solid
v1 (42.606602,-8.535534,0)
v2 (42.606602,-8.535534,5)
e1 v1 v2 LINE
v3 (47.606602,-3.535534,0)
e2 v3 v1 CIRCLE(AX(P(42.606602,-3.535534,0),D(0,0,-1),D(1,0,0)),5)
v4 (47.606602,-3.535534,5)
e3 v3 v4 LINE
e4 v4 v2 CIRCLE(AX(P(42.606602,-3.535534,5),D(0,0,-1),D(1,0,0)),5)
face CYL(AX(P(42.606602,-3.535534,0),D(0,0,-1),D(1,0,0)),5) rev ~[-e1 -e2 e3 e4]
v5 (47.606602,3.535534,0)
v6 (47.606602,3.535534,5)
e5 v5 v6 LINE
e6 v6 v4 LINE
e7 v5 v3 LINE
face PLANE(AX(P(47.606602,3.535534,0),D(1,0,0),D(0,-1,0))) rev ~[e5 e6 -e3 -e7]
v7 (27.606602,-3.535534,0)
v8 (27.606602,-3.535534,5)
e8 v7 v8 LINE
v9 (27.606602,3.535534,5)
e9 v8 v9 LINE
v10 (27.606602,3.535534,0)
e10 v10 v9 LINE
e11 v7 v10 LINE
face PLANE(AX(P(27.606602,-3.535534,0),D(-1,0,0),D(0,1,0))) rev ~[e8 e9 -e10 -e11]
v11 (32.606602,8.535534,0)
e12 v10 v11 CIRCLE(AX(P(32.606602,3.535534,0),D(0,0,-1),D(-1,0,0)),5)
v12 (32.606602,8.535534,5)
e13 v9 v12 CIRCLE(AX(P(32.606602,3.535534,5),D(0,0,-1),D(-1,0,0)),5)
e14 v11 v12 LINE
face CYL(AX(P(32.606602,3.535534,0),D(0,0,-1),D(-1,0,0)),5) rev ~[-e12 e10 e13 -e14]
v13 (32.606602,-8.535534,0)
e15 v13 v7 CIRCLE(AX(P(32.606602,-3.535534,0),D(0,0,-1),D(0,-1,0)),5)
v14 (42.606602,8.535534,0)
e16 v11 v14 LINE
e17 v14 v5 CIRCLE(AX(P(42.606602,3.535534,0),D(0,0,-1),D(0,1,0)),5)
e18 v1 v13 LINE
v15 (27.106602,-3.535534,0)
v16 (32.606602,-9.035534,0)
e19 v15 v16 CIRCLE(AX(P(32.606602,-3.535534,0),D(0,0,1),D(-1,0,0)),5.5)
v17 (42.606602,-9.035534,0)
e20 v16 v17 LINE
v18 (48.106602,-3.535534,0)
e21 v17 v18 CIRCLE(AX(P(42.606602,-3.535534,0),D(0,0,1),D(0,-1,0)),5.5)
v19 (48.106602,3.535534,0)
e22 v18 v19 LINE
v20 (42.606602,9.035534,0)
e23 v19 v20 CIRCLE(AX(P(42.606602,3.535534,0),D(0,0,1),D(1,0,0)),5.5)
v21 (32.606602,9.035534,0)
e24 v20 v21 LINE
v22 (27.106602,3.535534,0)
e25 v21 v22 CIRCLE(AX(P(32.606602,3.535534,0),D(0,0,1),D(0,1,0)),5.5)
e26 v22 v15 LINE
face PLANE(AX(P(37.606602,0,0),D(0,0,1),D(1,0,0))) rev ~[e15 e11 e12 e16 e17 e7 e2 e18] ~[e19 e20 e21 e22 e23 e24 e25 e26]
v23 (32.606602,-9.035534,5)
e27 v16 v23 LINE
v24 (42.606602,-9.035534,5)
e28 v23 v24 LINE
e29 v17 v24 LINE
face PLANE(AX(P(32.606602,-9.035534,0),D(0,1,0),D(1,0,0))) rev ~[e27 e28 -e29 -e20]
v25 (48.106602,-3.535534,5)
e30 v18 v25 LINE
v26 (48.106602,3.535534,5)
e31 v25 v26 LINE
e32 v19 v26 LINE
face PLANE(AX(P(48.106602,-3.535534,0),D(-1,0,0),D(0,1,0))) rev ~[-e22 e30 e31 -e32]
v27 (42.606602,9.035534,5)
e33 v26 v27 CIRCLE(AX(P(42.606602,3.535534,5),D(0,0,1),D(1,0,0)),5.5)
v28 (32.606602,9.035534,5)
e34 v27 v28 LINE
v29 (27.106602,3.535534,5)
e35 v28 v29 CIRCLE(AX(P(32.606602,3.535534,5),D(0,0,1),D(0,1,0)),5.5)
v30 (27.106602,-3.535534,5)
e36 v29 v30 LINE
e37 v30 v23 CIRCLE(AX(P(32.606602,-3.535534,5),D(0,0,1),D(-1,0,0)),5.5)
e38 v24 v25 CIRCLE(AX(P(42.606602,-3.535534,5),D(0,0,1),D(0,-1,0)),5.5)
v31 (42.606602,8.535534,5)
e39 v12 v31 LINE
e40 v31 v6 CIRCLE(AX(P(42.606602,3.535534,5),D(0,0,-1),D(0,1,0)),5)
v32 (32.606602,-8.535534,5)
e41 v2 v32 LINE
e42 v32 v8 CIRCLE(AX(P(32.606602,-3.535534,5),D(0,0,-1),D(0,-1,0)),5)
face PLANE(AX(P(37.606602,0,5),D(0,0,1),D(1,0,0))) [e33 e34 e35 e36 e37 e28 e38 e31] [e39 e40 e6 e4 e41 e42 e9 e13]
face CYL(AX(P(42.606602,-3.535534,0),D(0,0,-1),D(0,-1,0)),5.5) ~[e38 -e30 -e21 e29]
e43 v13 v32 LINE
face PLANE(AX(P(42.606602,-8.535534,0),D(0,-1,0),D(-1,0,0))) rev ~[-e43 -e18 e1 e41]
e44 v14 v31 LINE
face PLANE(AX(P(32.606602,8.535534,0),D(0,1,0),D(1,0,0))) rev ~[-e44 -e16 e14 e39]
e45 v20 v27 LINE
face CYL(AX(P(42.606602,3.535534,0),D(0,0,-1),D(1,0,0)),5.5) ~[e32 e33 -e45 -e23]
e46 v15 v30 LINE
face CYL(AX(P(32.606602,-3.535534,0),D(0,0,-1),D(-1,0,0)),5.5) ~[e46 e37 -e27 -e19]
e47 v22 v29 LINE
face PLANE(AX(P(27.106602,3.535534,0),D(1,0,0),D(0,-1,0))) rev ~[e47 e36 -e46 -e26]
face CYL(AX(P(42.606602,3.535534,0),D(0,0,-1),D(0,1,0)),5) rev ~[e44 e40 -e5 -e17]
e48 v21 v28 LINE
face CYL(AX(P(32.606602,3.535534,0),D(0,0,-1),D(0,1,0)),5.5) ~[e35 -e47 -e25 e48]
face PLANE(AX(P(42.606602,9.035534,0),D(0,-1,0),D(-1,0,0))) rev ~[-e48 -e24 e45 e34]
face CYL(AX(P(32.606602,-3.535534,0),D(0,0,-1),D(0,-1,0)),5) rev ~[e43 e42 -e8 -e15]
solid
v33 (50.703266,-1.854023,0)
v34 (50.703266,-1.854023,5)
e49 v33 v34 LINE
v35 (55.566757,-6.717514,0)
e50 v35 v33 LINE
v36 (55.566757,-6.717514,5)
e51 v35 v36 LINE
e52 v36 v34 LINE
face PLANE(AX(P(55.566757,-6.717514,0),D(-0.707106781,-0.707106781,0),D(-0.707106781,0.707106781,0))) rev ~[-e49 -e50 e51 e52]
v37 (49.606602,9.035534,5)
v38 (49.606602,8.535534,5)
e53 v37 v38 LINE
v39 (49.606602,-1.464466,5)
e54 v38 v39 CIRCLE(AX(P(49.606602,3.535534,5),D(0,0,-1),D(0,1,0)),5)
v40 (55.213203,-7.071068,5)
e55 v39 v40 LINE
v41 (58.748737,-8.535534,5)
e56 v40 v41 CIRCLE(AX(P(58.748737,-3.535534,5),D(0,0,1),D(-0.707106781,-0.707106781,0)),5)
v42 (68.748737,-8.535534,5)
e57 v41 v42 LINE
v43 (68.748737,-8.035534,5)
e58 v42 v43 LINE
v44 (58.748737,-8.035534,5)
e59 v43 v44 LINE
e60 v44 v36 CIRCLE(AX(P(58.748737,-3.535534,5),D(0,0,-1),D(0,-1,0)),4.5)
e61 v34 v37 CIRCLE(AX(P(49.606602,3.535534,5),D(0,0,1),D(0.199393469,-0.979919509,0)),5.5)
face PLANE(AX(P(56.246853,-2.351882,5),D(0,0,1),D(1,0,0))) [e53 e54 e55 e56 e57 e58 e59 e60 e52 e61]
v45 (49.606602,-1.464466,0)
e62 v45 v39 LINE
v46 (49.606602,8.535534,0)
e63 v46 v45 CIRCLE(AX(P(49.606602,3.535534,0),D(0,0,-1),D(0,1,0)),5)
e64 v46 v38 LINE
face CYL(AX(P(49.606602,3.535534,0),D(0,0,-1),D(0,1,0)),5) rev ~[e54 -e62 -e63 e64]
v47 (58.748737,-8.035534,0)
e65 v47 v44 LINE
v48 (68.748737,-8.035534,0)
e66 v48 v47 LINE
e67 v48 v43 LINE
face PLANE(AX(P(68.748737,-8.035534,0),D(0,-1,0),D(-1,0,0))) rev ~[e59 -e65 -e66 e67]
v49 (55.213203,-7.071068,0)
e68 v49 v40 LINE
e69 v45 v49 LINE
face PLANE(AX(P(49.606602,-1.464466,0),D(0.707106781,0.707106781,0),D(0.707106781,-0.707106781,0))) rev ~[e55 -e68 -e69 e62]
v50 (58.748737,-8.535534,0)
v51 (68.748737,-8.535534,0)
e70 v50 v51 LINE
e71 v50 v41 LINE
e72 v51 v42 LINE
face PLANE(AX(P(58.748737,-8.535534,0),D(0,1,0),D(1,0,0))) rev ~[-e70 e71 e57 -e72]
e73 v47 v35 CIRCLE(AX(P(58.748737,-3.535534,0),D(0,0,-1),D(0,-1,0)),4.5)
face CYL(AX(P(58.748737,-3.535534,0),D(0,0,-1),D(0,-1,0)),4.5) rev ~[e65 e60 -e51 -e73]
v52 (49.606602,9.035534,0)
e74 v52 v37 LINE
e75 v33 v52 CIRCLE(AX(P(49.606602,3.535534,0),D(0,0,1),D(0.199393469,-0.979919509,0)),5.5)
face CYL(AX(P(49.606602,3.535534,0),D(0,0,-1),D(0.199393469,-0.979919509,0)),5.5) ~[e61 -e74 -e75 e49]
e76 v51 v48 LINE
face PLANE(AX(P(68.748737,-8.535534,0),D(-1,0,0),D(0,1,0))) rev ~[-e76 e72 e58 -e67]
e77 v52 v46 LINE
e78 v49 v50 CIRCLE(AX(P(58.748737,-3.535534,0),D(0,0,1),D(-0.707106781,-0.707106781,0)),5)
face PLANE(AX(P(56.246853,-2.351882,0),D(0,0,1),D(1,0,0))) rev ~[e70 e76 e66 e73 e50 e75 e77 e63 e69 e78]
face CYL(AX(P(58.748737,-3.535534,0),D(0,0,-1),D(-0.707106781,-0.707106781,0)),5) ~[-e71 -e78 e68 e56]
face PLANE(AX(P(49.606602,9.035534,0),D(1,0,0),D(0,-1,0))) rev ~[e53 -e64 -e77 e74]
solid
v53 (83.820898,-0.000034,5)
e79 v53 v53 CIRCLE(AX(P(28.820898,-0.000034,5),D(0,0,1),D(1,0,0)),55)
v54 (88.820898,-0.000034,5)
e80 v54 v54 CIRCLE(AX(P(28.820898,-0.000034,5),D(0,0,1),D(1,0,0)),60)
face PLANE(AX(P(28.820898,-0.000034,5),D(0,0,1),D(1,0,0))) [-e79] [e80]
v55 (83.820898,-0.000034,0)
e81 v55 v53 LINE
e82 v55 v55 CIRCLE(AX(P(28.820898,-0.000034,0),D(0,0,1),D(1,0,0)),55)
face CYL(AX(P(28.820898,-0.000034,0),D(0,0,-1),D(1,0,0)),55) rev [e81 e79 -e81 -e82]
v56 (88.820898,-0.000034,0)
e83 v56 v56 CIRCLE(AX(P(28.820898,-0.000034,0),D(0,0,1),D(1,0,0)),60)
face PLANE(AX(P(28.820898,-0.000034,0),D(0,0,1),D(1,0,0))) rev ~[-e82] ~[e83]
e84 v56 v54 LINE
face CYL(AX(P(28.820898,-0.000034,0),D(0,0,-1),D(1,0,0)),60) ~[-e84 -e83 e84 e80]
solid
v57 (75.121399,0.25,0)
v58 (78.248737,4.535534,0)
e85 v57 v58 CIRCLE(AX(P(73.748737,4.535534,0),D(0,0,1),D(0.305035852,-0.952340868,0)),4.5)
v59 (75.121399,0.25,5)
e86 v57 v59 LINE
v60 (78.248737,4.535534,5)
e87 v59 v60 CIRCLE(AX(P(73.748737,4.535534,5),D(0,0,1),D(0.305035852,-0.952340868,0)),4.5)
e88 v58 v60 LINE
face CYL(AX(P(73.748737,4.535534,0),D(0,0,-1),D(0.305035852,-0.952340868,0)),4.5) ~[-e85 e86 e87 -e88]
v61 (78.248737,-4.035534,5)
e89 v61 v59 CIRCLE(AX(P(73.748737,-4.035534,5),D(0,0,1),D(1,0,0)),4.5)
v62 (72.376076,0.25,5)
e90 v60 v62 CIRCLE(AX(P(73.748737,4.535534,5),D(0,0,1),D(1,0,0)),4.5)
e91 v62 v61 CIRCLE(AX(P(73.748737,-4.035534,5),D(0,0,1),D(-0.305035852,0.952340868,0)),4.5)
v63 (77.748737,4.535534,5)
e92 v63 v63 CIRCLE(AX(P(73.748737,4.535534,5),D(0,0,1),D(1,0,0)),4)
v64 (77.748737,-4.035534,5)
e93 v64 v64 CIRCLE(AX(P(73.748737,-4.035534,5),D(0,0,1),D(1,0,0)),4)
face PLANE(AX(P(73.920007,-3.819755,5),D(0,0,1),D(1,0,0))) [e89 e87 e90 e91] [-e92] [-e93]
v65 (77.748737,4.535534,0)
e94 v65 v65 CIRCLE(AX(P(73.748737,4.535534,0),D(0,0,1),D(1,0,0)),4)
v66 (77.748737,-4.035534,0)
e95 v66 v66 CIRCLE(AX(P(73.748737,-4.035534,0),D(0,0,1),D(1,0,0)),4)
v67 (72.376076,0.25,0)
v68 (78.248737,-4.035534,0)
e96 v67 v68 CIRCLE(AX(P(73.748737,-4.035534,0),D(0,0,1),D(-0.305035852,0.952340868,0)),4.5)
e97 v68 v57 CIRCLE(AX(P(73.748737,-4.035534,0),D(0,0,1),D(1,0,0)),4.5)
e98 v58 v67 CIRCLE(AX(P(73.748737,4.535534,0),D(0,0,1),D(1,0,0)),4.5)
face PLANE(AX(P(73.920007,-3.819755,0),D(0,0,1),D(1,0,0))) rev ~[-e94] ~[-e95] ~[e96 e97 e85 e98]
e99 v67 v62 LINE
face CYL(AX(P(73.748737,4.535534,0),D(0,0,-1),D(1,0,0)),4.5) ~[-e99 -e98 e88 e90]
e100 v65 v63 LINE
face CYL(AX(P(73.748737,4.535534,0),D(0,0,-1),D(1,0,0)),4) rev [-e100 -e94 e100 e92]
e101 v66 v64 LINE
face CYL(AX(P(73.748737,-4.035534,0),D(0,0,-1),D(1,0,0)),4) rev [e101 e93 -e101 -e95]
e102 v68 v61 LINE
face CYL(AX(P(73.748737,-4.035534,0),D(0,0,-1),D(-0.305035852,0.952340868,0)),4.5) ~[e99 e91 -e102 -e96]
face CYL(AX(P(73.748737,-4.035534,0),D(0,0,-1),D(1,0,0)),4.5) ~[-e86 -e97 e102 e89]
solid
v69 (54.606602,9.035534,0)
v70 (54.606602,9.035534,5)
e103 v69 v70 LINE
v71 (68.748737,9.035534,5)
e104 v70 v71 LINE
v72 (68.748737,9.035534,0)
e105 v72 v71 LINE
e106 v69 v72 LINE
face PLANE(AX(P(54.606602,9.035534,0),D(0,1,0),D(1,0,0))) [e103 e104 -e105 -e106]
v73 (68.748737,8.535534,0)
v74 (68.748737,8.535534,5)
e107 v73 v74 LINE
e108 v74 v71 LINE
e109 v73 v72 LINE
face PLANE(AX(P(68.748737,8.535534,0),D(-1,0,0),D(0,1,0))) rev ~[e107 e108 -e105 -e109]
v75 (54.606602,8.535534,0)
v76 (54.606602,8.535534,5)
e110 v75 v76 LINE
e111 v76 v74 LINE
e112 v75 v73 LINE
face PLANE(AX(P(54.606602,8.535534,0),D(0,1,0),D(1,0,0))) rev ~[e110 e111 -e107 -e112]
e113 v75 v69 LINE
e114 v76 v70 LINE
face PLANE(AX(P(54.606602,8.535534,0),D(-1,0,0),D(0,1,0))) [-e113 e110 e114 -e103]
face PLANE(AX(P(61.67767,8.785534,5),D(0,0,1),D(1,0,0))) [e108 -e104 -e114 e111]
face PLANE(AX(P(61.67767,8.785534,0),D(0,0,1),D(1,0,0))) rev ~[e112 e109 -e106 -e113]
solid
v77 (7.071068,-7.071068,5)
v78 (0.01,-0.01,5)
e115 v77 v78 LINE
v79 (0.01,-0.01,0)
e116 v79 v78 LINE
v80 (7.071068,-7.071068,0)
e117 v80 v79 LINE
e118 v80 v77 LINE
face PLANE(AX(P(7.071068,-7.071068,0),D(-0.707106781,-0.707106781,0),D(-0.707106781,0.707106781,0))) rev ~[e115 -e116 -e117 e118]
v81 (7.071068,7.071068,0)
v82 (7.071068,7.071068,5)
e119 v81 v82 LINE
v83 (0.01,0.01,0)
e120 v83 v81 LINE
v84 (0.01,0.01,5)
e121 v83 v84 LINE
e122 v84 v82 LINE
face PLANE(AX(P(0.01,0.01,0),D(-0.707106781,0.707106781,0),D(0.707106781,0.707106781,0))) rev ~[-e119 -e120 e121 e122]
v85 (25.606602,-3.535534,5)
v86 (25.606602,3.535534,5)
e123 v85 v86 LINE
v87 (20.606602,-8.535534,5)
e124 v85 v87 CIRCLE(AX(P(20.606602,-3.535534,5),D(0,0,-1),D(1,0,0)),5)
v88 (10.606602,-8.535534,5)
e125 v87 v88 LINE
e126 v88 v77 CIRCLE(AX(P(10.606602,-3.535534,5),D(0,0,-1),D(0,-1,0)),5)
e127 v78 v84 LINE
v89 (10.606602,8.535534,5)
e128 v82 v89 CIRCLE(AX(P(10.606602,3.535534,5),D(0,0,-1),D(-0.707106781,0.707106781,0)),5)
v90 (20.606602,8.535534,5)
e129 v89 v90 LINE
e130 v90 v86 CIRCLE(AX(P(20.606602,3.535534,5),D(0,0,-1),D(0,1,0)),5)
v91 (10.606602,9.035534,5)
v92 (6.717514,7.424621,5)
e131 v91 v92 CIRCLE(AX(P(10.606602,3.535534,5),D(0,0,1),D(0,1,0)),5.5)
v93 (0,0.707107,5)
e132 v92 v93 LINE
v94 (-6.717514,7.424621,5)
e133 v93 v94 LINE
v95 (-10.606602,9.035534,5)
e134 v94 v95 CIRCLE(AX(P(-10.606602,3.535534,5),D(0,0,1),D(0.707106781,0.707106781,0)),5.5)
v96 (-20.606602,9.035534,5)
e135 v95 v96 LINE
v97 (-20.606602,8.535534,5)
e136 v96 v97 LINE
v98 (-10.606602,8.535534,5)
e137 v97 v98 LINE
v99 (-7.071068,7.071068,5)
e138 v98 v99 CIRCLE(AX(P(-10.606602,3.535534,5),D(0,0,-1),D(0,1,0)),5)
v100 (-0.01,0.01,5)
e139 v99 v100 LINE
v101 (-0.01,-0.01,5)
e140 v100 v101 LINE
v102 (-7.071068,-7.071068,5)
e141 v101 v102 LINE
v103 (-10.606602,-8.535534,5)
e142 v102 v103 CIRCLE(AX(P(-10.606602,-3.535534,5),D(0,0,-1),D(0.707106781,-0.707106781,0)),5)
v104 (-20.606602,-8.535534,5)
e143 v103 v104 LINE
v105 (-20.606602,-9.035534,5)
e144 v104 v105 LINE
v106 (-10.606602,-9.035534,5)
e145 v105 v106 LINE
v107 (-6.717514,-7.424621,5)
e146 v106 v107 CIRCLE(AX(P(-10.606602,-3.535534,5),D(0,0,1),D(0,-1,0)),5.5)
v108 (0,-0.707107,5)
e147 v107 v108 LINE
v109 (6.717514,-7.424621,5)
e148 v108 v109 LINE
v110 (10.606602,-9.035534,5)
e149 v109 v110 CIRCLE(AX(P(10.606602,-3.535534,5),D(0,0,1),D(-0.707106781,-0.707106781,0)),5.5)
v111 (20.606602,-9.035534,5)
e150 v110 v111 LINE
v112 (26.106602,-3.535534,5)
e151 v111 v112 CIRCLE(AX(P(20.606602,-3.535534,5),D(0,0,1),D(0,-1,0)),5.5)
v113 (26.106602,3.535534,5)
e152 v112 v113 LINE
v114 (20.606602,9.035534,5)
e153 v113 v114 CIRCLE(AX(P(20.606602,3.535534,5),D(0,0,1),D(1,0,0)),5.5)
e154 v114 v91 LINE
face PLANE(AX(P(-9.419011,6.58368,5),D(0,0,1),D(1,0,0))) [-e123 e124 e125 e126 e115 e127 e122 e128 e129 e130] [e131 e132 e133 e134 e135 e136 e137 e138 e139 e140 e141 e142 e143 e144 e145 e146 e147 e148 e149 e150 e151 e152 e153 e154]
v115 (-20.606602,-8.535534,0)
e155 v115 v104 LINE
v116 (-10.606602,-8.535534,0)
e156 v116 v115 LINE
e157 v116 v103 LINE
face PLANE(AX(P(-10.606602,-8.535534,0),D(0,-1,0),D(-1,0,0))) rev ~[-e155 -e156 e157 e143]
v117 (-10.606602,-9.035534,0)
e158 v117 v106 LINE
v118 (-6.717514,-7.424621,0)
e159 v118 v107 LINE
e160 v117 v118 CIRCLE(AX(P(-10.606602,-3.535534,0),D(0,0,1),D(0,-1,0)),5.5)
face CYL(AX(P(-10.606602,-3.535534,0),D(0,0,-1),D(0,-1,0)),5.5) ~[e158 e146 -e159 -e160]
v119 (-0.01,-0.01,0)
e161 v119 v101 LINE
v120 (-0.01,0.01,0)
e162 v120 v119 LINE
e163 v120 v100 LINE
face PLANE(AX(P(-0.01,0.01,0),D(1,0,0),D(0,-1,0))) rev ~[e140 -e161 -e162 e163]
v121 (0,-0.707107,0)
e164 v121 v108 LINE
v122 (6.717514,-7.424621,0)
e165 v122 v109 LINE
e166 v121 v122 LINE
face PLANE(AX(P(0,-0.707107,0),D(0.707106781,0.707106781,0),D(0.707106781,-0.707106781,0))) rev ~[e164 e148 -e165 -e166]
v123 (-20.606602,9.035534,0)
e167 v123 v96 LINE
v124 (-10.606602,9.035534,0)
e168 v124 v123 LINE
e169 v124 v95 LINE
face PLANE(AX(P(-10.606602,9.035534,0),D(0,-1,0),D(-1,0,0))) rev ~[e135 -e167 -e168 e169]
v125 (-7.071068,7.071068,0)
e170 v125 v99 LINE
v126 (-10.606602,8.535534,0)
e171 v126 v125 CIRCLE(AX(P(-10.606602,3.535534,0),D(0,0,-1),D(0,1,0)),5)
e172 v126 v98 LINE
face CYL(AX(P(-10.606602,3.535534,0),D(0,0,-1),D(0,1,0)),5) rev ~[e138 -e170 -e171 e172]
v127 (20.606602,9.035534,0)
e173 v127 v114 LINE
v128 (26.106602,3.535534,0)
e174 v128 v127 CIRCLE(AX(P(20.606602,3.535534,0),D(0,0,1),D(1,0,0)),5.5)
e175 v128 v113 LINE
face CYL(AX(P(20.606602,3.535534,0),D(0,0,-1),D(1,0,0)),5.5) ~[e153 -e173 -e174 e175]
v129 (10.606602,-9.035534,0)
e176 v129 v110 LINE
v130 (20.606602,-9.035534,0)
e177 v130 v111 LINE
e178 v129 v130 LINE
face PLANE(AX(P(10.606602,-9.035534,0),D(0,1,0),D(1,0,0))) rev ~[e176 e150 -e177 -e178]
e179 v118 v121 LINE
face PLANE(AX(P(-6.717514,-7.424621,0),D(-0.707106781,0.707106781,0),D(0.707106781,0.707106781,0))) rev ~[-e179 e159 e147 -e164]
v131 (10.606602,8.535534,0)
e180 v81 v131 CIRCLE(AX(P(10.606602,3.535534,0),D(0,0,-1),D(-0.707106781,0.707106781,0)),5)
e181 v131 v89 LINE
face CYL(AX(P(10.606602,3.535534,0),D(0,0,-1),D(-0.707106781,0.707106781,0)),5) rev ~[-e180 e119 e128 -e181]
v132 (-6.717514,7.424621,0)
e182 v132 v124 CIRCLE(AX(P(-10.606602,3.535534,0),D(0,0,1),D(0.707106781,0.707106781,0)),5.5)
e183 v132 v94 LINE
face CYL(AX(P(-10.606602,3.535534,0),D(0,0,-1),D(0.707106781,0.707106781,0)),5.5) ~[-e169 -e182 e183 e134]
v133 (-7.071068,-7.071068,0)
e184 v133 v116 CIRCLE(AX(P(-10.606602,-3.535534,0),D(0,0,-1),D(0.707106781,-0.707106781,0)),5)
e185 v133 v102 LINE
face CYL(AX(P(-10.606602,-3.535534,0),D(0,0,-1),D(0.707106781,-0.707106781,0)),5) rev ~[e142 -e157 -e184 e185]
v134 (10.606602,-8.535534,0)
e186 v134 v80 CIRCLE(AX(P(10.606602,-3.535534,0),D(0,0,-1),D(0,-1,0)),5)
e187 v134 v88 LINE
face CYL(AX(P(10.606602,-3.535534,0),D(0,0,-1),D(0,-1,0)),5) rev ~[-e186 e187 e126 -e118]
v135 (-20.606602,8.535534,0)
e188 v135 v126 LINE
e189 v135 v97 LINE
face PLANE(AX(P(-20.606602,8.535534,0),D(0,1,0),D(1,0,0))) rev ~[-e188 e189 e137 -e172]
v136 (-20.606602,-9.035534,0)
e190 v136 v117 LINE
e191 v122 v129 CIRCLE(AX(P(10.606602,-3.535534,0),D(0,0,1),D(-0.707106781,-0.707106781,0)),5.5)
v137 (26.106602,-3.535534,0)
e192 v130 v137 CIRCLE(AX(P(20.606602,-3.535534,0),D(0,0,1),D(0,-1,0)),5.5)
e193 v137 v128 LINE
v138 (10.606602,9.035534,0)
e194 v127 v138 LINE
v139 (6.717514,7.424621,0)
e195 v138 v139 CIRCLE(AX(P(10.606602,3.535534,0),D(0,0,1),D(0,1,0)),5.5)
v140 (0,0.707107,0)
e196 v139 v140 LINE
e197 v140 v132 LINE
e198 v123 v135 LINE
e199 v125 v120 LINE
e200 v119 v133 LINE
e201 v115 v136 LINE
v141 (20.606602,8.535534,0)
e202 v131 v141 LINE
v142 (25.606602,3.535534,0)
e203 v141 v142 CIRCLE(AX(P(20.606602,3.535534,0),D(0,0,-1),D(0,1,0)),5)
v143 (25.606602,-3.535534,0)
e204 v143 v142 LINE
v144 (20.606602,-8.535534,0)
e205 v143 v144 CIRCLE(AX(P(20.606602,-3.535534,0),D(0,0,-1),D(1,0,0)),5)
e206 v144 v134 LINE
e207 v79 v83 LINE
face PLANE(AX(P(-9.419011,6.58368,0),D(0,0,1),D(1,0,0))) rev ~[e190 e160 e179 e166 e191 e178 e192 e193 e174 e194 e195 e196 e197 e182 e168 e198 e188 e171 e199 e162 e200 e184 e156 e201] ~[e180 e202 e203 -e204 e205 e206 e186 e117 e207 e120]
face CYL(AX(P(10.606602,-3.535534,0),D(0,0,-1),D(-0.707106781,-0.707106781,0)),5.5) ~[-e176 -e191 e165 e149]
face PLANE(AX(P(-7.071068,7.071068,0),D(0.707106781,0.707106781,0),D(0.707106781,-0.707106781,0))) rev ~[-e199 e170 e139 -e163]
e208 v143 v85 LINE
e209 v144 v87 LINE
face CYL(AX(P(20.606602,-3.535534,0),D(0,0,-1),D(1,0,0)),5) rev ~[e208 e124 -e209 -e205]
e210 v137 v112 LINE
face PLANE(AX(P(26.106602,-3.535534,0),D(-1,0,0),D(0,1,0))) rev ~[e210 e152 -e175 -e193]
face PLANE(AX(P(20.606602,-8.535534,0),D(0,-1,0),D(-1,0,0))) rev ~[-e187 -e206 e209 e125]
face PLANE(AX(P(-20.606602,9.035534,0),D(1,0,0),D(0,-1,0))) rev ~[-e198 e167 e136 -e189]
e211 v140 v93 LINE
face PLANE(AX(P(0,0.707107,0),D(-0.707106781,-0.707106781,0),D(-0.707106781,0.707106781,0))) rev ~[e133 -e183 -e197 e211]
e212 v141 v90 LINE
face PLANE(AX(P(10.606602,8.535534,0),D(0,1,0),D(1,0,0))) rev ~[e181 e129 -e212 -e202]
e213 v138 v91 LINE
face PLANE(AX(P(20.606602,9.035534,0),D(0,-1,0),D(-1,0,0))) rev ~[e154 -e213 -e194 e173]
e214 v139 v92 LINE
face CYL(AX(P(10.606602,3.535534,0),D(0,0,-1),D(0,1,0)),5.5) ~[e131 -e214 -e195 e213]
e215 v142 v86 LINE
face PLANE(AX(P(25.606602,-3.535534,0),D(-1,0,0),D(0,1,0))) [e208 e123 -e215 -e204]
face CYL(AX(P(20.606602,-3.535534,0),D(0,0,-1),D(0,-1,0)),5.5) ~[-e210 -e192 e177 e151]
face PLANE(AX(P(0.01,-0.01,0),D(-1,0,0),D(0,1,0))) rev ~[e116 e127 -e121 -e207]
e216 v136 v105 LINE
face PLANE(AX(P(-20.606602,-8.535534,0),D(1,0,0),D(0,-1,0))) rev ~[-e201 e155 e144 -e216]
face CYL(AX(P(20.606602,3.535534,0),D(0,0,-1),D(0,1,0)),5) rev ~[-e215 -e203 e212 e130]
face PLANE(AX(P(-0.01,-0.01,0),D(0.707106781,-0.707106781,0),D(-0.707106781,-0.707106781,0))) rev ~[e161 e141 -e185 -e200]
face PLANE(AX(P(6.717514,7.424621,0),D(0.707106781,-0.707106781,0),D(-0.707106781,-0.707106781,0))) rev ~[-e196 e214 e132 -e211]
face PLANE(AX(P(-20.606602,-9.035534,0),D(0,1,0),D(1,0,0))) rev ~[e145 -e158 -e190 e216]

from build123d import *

# Parameters (mm, degrees)
F0_W     = 0.5
F0_H     = 7.0710678119
F1_DEPTH = 5
F0_W_2   = 14.1421356237
F0_H_2   = 0.5
F0_R     = 4
F0_R_2   = 60
F0_R_3   = 55


# Not quite as in the source:
# - a feature names something its author has since deleted; it is built from what else it names


with BuildPart() as f1:
    # F0 (on Top) → F1 (new body)
    with BuildSketch(Plane.XY):
        with BuildLine():
            ThreePointArc((-10.6066017178, 8.5355339059), (-8.693184556, 8.1549315685), (-7.0710678119, 7.0710678119))
            Line((-7.0710678119, 7.0710678119), (-0.01, 0.01))
            Line((-0.01, 0.01), (0, 0))
            Line((0, 0), (0, 0.7071067812))
            Line((0, 0.7071067812), (-6.7175144213, 7.4246212025))
            ThreePointArc((-6.7175144213, 7.4246212025), (-8.5018428398, 8.6168713347), (-10.6066017178, 9.0355339059))
            Line((-10.6066017178, 9.0355339059), (-20.6066017178, 9.0355339059))
            Line((-20.6066017178, 9.0355339059), (-20.6066017178, 8.5355339059))
            Line((-20.6066017178, 8.5355339059), (-10.6066017178, 8.5355339059))
        make_face()
        Polygon((0, 0), (-0.01, 0.01), (-0.01, -0.01), align=None)
        with BuildLine():
            Line((0, -0.7071067812), (0, 0))
            Line((0, 0), (-0.01, -0.01))
            Line((-0.01, -0.01), (-7.0710678119, -7.0710678119))
            ThreePointArc((-7.0710678119, -7.0710678119), (-8.693184556, -8.1549315685), (-10.6066017178, -8.5355339059))
            Line((-10.6066017178, -8.5355339059), (-20.6066017178, -8.5355339059))
            Line((-20.6066017178, -8.5355339059), (-20.6066017178, -9.0355339059))
            Line((-20.6066017178, -9.0355339059), (-10.6066017178, -9.0355339059))
            ThreePointArc((-10.6066017178, -9.0355339059), (-8.5018428398, -8.6168713347), (-6.7175144213, -7.4246212025))
            Line((-6.7175144213, -7.4246212025), (0, -0.7071067812))
        make_face()
        with BuildLine():
            Line((0, 0.7071067812), (0, 0))
            Line((0, 0), (0.01, 0.01))
            Line((0.01, 0.01), (7.0710678119, 7.0710678119))
            ThreePointArc((7.0710678119, 7.0710678119), (8.693184556, 8.1549315685), (10.6066017178, 8.5355339059))
            Line((10.6066017178, 8.5355339059), (20.6066017178, 8.5355339059))
            ThreePointArc((20.6066017178, 8.5355339059), (24.1421356237, 7.0710678119), (25.6066017178, 3.5355339059))
            Line((25.6066017178, 3.5355339059), (26.1066017178, 3.5355339059))
            ThreePointArc((26.1066017178, 3.5355339059), (24.4956890143, 7.4246212025), (20.6066017178, 9.0355339059))
            Line((20.6066017178, 9.0355339059), (10.6066017178, 9.0355339059))
            ThreePointArc((10.6066017178, 9.0355339059), (8.5018428398, 8.6168713347), (6.7175144213, 7.4246212025))
            Line((6.7175144213, 7.4246212025), (0, 0.7071067812))
        make_face()
        Polygon((0.01, 0.01), (0, 0), (0.01, -0.01), align=None)
        with BuildLine():
            Line((0.01, -0.01), (0, 0))
            Line((0, 0), (0, -0.7071067812))
            Line((0, -0.7071067812), (6.7175144213, -7.4246212025))
            ThreePointArc((6.7175144213, -7.4246212025), (8.5018428398, -8.6168713347), (10.6066017178, -9.0355339059))
            Line((10.6066017178, -9.0355339059), (20.6066017178, -9.0355339059))
            ThreePointArc((20.6066017178, -9.0355339059), (24.4956890143, -7.4246212025), (26.1066017178, -3.5355339059))
            Line((26.1066017178, -3.5355339059), (25.6066017178, -3.5355339059))
            ThreePointArc((25.6066017178, -3.5355339059), (24.1421356237, -7.0710678119), (20.6066017178, -8.5355339059))
            Line((20.6066017178, -8.5355339059), (10.6066017178, -8.5355339059))
            ThreePointArc((10.6066017178, -8.5355339059), (8.693184556, -8.1549315685), (7.0710678119, -7.0710678119))
            Line((7.0710678119, -7.0710678119), (0.01, -0.01))
        make_face()
        with Locations((25.8566017178, 0)):
            Rectangle(F0_W, F0_H)
    extrude(amount=F1_DEPTH)


with BuildPart() as f1b:
    # F0 (on Top) → F1, piece 2 (new body)
    with BuildSketch(Plane.XY):
        with BuildLine():
            ThreePointArc((49.6066017178, 8.5355339059), (54.6066017178, 3.5355339059), (49.6066017178, -1.4644660941))
            Line((49.6066017178, -1.4644660941), (55.2132034356, -7.0710678119))
            ThreePointArc((55.2132034356, -7.0710678119), (56.8353201797, -8.1549315685), (58.7487373415, -8.5355339059))
            Line((58.7487373415, -8.5355339059), (68.7487373415, -8.5355339059))
            Line((68.7487373415, -8.5355339059), (68.7487373415, -8.0355339059))
            Line((68.7487373415, -8.0355339059), (58.7487373415, -8.0355339059))
            ThreePointArc((58.7487373415, -8.0355339059), (57.0266618959, -7.6929918022), (55.5667568262, -6.7175144213))
            Line((55.5667568262, -6.7175144213), (50.7032657992, -1.8540233943))
            ThreePointArc((50.7032657992, -1.8540233943), (55.0789213883, 4.086639544), (49.6066017178, 9.0355339059))
            Line((49.6066017178, 9.0355339059), (49.6066017178, 8.5355339059))
        make_face()
    extrude(amount=F1_DEPTH)


with BuildPart() as f1c:
    # F0 (on Top) → F1, piece 3 (new body)
    with BuildSketch(Plane.XY):
        with Locations((61.6776695297, 8.7855339059)):
            Rectangle(F0_W_2, F0_H_2)
    extrude(amount=F1_DEPTH)


with BuildPart() as f1d:
    # F0 (on Top) → F1, piece 4 (new body)
    with BuildSketch(Plane.XY):
        with BuildLine():
            ThreePointArc((72.3760760063, 0.25), (71.0960948862, -7.6705700824), (78.2487373415, -4.0355339059))
            ThreePointArc((78.2487373415, -4.0355339059), (77.383773518, -1.3828914506), (75.1213986767, 0.25))
            ThreePointArc((75.1213986767, 0.25), (73.7487373415, 0.0355339059), (72.3760760063, 0.25))
        make_face()
        with Locations((73.7487373415, -4.0355339059)):
            Circle(F0_R, mode=Mode.SUBTRACT)
        with BuildLine():
            ThreePointArc((72.3760760063, 0.25), (73.7487373415, 0.0355339059), (75.1213986767, 0.25))
            ThreePointArc((75.1213986767, 0.25), (73.7487373415, 0.4644660941), (72.3760760063, 0.25))
        make_face()
        with BuildLine():
            ThreePointArc((72.3760760063, 0.25), (73.7487373415, 0.4644660941), (75.1213986767, 0.25))
            ThreePointArc((75.1213986767, 0.25), (77.383773518, 1.8828914506), (78.2487373415, 4.5355339059))
            ThreePointArc((78.2487373415, 4.5355339059), (71.0960948862, 8.1705700824), (72.3760760063, 0.25))
        make_face()
        with Locations((73.7487373415, 4.5355339059)):
            Circle(F0_R, mode=Mode.SUBTRACT)
    extrude(amount=F1_DEPTH)


with BuildPart() as f1e:
    # F0 (on Top) → F1, piece 5 (new body)
    with BuildSketch(Plane.XY):
        with BuildLine():
            Line((42.6066017178, 9.0355339059), (32.6066017178, 9.0355339059))
            ThreePointArc((32.6066017178, 9.0355339059), (28.7175144213, 7.4246212025), (27.1066017178, 3.5355339059))
            Line((27.1066017178, 3.5355339059), (27.1066017178, -3.5355339059))
            ThreePointArc((27.1066017178, -3.5355339059), (28.7175144213, -7.4246212025), (32.6066017178, -9.0355339059))
            Line((32.6066017178, -9.0355339059), (42.6066017178, -9.0355339059))
            ThreePointArc((42.6066017178, -9.0355339059), (46.4956890143, -7.4246212025), (48.1066017178, -3.5355339059))
            Line((48.1066017178, -3.5355339059), (48.1066017178, 3.5355339059))
            ThreePointArc((48.1066017178, 3.5355339059), (46.4956890143, 7.4246212025), (42.6066017178, 9.0355339059))
        make_face()
        with BuildLine():
            Line((27.6066017178, -3.5355339059), (27.6066017178, 3.5355339059))
            ThreePointArc((27.6066017178, 3.5355339059), (29.0710678119, 7.0710678119), (32.6066017178, 8.5355339059))
            Line((32.6066017178, 8.5355339059), (42.6066017178, 8.5355339059))
            ThreePointArc((42.6066017178, 8.5355339059), (46.1421356237, 7.0710678119), (47.6066017178, 3.5355339059))
            Line((47.6066017178, 3.5355339059), (47.6066017178, -3.5355339059))
            ThreePointArc((47.6066017178, -3.5355339059), (46.1421356237, -7.0710678119), (42.6066017178, -8.5355339059))
            Line((42.6066017178, -8.5355339059), (32.6066017178, -8.5355339059))
            ThreePointArc((32.6066017178, -8.5355339059), (29.0710678119, -7.0710678119), (27.6066017178, -3.5355339059))
        make_face(mode=Mode.SUBTRACT)
    extrude(amount=F1_DEPTH)


with BuildPart() as f1f:
    # F0 (on Top) → F1, piece 6 (new body)
    with BuildSketch(Plane.XY):
        with Locations((28.8208982822, -3.39059e-05)):
            Circle(F0_R_2)
        with Locations((28.8208982822, -3.39059e-05)):
            Circle(F0_R_3, mode=Mode.SUBTRACT)
    extrude(amount=F1_DEPTH)


solid = Compound([f1.part, f1b.part, f1c.part, f1d.part, f1e.part, f1f.part])
